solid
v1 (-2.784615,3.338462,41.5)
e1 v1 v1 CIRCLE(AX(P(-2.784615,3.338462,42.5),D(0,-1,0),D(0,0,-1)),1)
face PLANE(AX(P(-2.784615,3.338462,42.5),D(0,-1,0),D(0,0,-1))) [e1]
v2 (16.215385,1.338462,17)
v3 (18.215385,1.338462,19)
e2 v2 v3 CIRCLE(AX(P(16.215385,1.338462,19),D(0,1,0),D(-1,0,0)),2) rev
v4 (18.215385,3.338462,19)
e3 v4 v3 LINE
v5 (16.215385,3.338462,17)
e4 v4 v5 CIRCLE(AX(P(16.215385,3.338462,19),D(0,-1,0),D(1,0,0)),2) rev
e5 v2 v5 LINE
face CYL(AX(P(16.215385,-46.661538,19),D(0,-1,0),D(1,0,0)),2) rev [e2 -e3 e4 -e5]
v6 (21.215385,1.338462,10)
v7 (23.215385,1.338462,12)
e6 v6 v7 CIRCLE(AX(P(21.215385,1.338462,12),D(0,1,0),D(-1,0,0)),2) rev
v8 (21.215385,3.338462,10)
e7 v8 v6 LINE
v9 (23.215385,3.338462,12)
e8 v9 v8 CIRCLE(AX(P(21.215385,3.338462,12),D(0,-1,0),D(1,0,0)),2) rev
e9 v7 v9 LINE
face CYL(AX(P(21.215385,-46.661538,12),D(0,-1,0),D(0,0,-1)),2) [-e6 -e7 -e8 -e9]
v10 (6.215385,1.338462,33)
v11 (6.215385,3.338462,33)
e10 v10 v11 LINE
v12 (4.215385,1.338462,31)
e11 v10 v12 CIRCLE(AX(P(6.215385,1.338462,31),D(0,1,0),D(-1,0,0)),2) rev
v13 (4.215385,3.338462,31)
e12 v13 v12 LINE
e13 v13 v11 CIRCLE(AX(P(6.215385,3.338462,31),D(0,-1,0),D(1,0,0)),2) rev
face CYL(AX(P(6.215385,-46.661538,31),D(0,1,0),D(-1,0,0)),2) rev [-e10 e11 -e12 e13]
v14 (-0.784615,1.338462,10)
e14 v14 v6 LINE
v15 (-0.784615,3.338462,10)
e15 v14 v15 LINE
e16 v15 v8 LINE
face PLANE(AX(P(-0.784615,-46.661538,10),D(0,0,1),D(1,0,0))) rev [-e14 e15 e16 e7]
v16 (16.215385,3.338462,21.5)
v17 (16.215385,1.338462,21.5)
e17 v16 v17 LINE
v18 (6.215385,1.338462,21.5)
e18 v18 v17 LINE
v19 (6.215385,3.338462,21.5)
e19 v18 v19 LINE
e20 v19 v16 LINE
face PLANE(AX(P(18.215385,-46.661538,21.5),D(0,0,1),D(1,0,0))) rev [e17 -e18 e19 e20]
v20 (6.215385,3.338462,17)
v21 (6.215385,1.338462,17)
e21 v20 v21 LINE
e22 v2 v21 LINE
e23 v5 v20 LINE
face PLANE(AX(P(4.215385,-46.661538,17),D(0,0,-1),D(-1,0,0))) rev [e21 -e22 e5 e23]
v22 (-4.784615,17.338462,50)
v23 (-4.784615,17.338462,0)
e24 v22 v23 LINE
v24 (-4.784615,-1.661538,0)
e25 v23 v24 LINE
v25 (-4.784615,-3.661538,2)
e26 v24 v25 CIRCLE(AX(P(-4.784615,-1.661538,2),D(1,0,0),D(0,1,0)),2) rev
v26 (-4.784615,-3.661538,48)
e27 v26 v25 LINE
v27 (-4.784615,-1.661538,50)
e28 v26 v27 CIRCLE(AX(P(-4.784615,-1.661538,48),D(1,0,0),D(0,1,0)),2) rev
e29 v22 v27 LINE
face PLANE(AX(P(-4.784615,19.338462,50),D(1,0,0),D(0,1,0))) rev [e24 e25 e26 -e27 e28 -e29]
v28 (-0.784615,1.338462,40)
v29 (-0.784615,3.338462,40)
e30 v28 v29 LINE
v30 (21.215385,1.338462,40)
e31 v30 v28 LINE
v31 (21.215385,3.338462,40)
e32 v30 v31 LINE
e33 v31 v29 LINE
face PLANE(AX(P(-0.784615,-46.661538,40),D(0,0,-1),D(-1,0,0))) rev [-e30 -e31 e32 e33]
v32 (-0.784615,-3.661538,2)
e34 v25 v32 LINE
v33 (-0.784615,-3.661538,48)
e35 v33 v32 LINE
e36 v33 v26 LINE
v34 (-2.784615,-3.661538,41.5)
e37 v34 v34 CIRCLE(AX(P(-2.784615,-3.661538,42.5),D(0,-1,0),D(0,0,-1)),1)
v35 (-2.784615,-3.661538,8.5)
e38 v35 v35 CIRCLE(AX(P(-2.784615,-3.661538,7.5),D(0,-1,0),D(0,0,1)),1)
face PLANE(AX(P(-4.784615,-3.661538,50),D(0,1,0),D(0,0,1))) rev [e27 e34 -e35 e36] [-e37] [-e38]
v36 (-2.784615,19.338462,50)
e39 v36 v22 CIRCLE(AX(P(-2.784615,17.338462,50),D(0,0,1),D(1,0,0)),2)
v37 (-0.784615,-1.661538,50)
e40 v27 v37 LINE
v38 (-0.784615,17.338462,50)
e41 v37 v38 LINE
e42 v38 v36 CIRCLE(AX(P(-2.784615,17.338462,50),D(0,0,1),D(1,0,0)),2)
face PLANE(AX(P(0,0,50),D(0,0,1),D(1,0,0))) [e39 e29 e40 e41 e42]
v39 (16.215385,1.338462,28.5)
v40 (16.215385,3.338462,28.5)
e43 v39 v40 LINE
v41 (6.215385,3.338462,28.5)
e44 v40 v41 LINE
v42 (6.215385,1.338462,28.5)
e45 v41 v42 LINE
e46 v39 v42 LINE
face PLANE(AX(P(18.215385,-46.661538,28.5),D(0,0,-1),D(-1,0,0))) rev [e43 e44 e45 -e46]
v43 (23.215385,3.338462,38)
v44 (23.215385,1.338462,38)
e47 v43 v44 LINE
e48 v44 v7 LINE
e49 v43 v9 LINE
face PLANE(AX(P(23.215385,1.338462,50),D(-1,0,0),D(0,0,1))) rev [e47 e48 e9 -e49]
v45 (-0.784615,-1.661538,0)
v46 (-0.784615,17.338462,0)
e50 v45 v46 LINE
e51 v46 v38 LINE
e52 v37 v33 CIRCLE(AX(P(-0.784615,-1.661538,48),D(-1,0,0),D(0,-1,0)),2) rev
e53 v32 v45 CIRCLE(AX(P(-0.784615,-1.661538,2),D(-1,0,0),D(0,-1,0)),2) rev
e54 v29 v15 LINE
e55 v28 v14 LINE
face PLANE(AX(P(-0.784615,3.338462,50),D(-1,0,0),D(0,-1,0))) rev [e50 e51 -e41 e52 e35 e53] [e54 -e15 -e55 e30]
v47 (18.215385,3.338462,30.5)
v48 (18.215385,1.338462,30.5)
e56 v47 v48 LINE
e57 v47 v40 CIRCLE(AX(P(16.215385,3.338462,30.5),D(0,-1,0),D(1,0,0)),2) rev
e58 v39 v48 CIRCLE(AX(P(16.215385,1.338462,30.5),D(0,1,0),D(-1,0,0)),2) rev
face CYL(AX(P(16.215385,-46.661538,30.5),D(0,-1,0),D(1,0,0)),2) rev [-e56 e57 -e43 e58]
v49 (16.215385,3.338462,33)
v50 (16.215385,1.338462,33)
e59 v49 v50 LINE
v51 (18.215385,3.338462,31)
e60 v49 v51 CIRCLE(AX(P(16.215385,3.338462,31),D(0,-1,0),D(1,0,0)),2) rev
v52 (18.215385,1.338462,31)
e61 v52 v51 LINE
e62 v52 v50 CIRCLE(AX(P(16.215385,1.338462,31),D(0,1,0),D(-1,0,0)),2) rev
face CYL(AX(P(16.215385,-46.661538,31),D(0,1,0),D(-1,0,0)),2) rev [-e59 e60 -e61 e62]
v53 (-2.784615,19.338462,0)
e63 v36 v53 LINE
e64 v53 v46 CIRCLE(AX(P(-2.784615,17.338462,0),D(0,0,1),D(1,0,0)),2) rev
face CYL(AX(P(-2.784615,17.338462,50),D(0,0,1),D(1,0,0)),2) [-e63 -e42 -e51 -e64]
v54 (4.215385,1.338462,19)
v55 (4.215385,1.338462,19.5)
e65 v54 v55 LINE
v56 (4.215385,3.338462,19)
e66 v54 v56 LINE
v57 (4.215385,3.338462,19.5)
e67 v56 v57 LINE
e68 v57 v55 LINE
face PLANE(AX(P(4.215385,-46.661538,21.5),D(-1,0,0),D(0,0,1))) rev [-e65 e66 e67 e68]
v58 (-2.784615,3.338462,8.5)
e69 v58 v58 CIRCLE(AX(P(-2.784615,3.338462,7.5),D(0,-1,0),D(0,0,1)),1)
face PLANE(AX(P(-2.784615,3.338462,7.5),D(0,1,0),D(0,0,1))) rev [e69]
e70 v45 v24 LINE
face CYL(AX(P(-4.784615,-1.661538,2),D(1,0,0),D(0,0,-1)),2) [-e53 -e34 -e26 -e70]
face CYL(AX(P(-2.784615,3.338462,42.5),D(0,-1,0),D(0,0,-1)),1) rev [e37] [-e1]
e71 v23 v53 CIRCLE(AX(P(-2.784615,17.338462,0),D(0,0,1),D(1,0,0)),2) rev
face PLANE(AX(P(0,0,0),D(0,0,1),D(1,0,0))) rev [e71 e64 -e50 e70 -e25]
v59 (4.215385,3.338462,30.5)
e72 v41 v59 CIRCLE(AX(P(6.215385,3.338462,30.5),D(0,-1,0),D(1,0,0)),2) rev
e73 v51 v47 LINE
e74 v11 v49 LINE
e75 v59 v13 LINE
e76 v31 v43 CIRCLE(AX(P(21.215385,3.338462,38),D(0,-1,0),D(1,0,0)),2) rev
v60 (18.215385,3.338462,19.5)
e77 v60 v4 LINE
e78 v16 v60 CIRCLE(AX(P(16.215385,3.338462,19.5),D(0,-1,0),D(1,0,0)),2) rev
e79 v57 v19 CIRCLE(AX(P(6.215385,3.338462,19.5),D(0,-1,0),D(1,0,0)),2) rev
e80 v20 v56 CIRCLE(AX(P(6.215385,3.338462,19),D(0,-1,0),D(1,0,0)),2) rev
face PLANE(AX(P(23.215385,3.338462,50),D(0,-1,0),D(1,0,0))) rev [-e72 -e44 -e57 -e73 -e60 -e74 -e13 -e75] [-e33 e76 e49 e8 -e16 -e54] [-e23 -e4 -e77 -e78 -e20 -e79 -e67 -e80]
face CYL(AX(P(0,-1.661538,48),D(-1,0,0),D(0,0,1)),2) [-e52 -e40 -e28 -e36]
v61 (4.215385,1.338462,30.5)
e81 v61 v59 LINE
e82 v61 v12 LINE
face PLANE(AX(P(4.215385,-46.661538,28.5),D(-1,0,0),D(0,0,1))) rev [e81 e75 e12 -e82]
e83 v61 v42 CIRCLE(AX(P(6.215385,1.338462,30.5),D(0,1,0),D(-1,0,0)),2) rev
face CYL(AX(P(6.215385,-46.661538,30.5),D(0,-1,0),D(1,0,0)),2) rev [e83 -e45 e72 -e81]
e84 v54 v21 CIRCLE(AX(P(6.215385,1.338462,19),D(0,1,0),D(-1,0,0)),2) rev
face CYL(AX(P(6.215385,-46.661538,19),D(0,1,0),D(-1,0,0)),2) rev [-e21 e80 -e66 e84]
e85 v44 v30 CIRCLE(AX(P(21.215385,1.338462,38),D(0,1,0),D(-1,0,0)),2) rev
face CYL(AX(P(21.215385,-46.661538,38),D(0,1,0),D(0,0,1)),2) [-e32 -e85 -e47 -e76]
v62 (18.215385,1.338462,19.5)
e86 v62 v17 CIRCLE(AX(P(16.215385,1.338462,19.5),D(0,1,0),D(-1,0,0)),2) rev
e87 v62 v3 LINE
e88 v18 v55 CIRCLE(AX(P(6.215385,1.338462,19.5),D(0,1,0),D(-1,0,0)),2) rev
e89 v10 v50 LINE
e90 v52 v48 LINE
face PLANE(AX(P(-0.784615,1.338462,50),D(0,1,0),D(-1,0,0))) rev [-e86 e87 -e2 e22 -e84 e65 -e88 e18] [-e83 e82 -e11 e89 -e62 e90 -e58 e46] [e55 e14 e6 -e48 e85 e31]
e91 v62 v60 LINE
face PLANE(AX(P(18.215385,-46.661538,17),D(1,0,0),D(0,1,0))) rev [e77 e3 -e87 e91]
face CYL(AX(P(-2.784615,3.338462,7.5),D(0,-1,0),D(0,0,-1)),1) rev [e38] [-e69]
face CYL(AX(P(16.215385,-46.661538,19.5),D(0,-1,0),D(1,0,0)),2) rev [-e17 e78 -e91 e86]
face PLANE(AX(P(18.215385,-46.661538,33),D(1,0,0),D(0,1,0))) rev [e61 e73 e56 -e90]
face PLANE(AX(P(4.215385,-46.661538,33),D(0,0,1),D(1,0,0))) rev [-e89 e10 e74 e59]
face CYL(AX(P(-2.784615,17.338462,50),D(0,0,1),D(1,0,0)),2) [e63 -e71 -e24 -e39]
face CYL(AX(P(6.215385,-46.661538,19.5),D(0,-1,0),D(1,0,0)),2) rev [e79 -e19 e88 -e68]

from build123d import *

# Parameters (mm, degrees)
EXTRUDE_1_DEPTH     = 50
SKETCH_2_W          = 24
SKETCH_2_H          = 10
SKETCH_2_W_2        = 14
SKETCH_2_H_2        = 4.5
CUT_EXTRUDE_1_DEPTH = 50
FILLET_1_R          = 2
FILLET_2_R          = 2
FILLET_3_R          = 2
FILLET_4_R          = 2
FILLET_5_R          = 2
FILLET_6_R          = 2
FILLET_7_R          = 2
FILLET_8_R          = 2
FILLET_9_R          = 2
FILLET_10_R         = 2
FILLET_11_R         = 2
FILLET_12_R         = 2
FILLET_14_R         = 2
FILLET_15_R         = 2
SKETCH_3_R          = 1
CUT_EXTRUDE_2_DEPTH = 7


with BuildPart() as part:
    # 草图1 → 凸台-拉伸1 (new body)
    with BuildSketch(Plane.XY):
        Polygon((-4.784615385, 19.338461538), (-4.784615385, -3.661538462), (-0.784615385, -3.661538462), (-0.784615385, 1.338461538), (23.215384615, 1.338461538), (23.215384615, 3.338461538), (-0.784615385, 3.338461538), (-0.784615385, 19.338461538), align=None)
    extrude(amount=EXTRUDE_1_DEPTH)

    # 草图2 → 切除-拉伸1 (cut)
    with BuildSketch(Plane(origin=(0, 3.338461538, 0), x_dir=(1, 0, 0), z_dir=(0, 1, 0))):
        with Locations((11.215384615, -45)):
            Rectangle(SKETCH_2_W, SKETCH_2_H)
        with Locations((11.215384615, -30.75)):
            Rectangle(SKETCH_2_W_2, SKETCH_2_H_2)
        with Locations((11.215384615, -19.25)):
            Rectangle(SKETCH_2_W_2, SKETCH_2_H_2)
        with Locations((11.215384615, -5)):
            Rectangle(SKETCH_2_W, SKETCH_2_H)
    extrude(amount=-CUT_EXTRUDE_1_DEPTH, mode=Mode.SUBTRACT)

    # 圆角1
    fillet_1_edges = [part.edges().sort_by_distance(p)[0] for p in [
        (23.215384615, 2.338461538, 40),
    ]]
    fillet(fillet_1_edges, radius=FILLET_1_R)

    # 圆角2
    fillet_2_edges = [part.edges().sort_by_distance(p)[0] for p in [
        (23.215384615, 2.338461538, 10),
    ]]
    fillet(fillet_2_edges, radius=FILLET_2_R)

    # 圆角3
    fillet_3_edges = [part.edges().sort_by_distance(p)[0] for p in [
        (4.215384615, 2.338461538, 28.5),
    ]]
    fillet(fillet_3_edges, radius=FILLET_3_R)

    # 圆角4
    fillet_4_edges = [part.edges().sort_by_distance(p)[0] for p in [
        (4.215384615, 2.338461538, 33),
    ]]
    fillet(fillet_4_edges, radius=FILLET_4_R)

    # 圆角5
    fillet_5_edges = [part.edges().sort_by_distance(p)[0] for p in [
        (4.215384615, 2.338461538, 17),
    ]]
    fillet(fillet_5_edges, radius=FILLET_5_R)

    # 圆角6
    fillet_6_edges = [part.edges().sort_by_distance(p)[0] for p in [
        (4.215384615, 2.338461538, 21.5),
    ]]
    fillet(fillet_6_edges, radius=FILLET_6_R)

    # 圆角7
    fillet_7_edges = [part.edges().sort_by_distance(p)[0] for p in [
        (18.215384615, 2.338461538, 17),
    ]]
    fillet(fillet_7_edges, radius=FILLET_7_R)

    # 圆角8
    fillet_8_edges = [part.edges().sort_by_distance(p)[0] for p in [
        (18.215384615, 2.338461538, 33),
    ]]
    fillet(fillet_8_edges, radius=FILLET_8_R)

    # 圆角9
    fillet_9_edges = [part.edges().sort_by_distance(p)[0] for p in [
        (18.215384615, 2.338461538, 28.5),
    ]]
    fillet(fillet_9_edges, radius=FILLET_9_R)

    # 圆角10
    fillet_10_edges = [part.edges().sort_by_distance(p)[0] for p in [
        (18.215384615, 2.338461538, 21.5),
    ]]
    fillet(fillet_10_edges, radius=FILLET_10_R)

    # 圆角11
    fillet_11_edges = [part.edges().sort_by_distance(p)[0] for p in [
        (-0.784615385, 19.338461538, 25),
    ]]
    fillet(fillet_11_edges, radius=FILLET_11_R)

    # 圆角12
    fillet_12_edges = [part.edges().sort_by_distance(p)[0] for p in [
        (-4.784615385, 19.338461538, 25),
    ]]
    fillet(fillet_12_edges, radius=FILLET_12_R - 0.0001)  # a hair under: the kernel refuses the full size

    # 圆角14
    fillet_14_edges = [part.edges().sort_by_distance(p)[0] for p in [
        (-2.784615385, -3.661538462, 50),
    ]]
    fillet(fillet_14_edges, radius=FILLET_14_R)

    # 圆角15
    fillet_15_edges = [part.edges().sort_by_distance(p)[0] for p in [
        (-2.784615385, -3.661538462, 0),
    ]]
    fillet(fillet_15_edges, radius=FILLET_15_R)

    # 草图3 → 切除-拉伸2 (cut)
    with BuildSketch(Plane.XZ.offset(3.661538462)):
        with Locations(Location((-2.784615385, 42.5, 0), (0, 0, 270))):
            Circle(SKETCH_3_R)
        with Locations(Location((-2.784615385, 7.5, 0), (0, 0, 90))):
            Circle(SKETCH_3_R)
    extrude(amount=-CUT_EXTRUDE_2_DEPTH, mode=Mode.SUBTRACT)


solid = part.part
